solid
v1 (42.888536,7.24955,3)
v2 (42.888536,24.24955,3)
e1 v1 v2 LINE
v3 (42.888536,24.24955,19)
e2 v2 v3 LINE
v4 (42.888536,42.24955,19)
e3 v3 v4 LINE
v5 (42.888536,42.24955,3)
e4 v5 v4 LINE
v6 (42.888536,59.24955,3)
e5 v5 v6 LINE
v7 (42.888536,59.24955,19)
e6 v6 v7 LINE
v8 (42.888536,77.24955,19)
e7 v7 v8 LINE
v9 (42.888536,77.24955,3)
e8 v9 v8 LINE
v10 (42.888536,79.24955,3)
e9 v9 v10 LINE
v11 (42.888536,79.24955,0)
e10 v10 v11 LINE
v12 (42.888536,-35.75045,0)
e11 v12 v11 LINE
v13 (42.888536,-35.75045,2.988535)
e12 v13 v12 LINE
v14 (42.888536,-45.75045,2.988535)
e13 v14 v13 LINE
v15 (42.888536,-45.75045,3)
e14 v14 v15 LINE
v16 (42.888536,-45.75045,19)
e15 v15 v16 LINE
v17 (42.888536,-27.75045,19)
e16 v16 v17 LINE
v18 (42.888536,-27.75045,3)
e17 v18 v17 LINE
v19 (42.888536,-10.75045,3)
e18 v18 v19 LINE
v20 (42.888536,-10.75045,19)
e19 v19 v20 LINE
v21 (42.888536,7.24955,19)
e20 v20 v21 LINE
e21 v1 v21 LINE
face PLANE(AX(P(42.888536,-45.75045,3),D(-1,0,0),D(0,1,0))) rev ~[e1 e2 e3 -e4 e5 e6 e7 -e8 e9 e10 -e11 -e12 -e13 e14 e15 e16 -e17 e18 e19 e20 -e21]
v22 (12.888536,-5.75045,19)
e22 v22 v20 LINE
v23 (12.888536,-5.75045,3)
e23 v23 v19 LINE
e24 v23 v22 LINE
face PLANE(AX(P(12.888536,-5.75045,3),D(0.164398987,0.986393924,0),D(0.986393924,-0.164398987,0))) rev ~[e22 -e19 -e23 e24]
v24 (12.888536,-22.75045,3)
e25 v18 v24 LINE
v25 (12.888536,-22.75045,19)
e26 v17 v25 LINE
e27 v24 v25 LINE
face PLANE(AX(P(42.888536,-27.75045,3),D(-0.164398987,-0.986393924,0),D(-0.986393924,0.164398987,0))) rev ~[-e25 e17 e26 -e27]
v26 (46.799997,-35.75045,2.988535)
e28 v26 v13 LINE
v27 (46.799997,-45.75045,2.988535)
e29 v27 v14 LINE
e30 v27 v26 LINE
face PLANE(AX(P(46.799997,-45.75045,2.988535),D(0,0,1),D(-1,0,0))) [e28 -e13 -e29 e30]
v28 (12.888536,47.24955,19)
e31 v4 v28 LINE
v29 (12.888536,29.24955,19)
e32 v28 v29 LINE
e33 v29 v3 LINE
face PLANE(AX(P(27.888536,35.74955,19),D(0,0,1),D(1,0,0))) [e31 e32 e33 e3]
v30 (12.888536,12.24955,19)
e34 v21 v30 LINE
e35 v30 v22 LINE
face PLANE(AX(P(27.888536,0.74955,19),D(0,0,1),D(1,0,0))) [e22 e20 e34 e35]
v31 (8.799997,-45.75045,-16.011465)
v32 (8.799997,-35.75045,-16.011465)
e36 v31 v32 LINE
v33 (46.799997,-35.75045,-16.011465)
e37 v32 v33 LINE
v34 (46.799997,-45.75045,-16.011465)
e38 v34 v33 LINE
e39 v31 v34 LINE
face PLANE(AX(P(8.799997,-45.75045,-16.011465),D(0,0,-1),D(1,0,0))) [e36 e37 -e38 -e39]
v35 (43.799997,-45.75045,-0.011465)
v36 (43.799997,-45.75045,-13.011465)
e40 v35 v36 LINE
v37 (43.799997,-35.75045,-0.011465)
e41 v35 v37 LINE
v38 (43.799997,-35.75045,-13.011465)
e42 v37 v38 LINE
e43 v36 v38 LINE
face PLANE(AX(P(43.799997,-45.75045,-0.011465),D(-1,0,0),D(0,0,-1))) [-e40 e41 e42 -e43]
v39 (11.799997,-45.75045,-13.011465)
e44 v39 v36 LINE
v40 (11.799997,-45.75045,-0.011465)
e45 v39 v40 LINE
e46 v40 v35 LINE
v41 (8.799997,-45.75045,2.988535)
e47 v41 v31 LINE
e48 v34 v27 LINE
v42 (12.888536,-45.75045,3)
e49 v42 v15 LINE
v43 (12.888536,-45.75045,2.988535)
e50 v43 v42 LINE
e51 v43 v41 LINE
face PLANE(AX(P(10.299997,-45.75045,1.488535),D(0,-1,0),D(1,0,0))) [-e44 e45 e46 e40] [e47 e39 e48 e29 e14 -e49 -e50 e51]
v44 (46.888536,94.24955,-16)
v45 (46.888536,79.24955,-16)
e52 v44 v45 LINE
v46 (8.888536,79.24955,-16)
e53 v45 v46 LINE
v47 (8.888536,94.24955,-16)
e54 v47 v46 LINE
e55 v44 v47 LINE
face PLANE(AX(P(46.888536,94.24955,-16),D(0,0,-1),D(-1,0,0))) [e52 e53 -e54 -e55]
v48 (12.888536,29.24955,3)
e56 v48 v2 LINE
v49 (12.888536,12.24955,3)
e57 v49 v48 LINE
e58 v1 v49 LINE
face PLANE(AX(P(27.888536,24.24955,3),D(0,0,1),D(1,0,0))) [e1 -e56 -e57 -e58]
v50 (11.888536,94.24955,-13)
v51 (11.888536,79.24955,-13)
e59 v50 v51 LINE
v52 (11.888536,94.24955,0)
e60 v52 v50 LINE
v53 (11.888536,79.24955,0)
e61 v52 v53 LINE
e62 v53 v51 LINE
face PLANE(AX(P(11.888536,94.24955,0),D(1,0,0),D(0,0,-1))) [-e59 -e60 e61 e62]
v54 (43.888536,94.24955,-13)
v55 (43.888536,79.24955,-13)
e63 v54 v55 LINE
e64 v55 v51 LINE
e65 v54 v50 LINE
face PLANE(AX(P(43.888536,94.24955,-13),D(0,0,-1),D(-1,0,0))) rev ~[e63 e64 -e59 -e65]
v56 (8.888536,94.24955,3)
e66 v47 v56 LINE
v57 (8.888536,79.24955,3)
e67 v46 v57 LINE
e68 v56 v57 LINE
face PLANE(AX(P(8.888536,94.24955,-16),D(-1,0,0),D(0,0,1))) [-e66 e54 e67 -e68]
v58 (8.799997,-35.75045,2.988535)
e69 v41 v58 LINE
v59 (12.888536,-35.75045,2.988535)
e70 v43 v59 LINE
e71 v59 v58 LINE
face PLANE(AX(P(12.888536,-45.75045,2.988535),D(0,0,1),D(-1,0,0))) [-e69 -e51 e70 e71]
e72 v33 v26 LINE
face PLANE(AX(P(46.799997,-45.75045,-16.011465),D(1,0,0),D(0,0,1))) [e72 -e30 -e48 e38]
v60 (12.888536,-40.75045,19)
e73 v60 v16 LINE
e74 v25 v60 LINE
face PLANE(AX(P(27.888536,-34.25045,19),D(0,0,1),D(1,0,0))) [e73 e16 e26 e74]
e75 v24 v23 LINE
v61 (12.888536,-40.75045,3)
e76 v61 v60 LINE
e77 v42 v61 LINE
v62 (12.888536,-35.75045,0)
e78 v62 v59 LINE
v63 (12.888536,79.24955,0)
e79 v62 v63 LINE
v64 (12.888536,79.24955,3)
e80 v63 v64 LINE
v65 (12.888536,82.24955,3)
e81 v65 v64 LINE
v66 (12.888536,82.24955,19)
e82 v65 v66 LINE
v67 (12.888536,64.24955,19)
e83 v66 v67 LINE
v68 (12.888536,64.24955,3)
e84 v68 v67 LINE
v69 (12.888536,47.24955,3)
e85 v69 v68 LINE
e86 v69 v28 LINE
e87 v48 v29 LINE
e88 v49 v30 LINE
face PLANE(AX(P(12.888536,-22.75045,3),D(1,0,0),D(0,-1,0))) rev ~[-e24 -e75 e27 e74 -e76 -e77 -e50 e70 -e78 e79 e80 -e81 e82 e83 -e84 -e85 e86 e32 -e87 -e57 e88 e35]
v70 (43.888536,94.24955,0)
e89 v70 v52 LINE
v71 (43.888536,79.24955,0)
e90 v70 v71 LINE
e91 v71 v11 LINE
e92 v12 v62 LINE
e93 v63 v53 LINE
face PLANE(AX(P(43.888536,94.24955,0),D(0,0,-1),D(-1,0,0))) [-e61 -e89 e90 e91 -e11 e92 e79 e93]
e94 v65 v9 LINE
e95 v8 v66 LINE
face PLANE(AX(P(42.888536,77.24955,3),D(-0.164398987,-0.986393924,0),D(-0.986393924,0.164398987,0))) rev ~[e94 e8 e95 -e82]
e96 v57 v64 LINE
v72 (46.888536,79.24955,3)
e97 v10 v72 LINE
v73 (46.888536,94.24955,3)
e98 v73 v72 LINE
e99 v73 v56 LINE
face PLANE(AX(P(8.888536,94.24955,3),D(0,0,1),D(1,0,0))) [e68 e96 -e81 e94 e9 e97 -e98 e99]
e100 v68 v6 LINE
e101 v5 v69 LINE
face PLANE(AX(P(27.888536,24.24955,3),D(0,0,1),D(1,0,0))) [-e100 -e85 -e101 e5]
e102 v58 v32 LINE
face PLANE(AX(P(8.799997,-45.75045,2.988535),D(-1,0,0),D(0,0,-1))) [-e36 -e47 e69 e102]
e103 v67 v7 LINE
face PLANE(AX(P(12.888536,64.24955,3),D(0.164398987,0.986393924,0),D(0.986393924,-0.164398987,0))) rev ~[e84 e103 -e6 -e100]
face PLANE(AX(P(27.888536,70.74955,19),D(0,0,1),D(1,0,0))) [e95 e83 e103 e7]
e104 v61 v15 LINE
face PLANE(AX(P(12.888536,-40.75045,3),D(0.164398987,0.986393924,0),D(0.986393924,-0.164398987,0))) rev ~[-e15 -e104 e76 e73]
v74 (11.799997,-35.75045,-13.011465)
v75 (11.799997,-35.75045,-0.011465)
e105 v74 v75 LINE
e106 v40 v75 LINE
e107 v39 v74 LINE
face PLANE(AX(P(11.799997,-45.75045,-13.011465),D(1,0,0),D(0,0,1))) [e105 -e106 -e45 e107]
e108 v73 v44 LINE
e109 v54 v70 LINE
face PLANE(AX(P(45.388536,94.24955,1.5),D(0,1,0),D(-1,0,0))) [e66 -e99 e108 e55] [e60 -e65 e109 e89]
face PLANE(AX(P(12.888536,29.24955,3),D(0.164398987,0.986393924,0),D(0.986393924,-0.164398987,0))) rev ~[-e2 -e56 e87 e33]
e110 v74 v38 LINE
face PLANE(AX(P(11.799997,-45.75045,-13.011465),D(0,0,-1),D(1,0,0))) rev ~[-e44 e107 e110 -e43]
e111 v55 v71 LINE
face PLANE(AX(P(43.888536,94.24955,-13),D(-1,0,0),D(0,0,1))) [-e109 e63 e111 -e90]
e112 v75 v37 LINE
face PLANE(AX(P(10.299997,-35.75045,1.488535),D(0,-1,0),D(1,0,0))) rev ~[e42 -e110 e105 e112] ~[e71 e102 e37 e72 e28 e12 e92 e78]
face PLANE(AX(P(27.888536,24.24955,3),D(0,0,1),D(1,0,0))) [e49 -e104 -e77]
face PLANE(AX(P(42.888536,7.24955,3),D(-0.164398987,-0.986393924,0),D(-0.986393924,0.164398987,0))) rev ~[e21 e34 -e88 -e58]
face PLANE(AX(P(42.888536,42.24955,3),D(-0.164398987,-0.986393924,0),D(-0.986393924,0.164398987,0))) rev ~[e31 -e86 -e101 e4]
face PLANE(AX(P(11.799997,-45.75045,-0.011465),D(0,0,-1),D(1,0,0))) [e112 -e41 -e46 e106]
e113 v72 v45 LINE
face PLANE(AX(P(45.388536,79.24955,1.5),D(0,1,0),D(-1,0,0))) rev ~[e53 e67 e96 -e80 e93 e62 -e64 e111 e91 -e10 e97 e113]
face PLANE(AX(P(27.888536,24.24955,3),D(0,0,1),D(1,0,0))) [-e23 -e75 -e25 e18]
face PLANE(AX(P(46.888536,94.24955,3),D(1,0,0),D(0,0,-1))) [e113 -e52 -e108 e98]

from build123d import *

# Parameters (mm, degrees)
F0_W     = 30
F0_H     = 140
F1_DEPTH = 3
F3_DEPTH = 16
F4_W     = 3
F4_H     = 3
F4_W_2   = 1
F4_W_3   = 30
F4_W_4   = 32
F5_DEPTH = 15
F6_W     = 3
F6_H     = 3
F6_W_2   = 32
F7_DEPTH = 10


with BuildPart() as f1:
    # F0 (on Top) → F1 (new body)
    with BuildSketch(Plane.XY):
        with Locations((27.8885364532, 24.2495501014)):
            Rectangle(F0_W, F0_H)
    extrude(amount=F1_DEPTH)

    # F2 (on face) → F3 (join)
    with BuildSketch(Plane.XY.offset(3)):
        Polygon((42.8885364532, -27.7504498986), (12.8885364532, -22.7504498986), (12.8885364532, -40.7504498986), (42.8885364532, -45.7504498986), align=None)
        Polygon((12.8885364532, 12.2495501014), (12.8885364532, -5.7504498986), (42.8885364532, -10.7504498986), (42.8885364532, 7.2495501014), align=None)
        Polygon((12.8885364532, 47.2495501014), (12.8885364532, 29.2495501014), (42.8885364532, 24.2495501014), (42.8885364532, 42.2495501014), align=None)
        Polygon((12.8885364532, 82.2495501014), (12.8885364532, 64.2495501014), (42.8885364532, 59.2495501014), (42.8885364532, 77.2495501014), align=None)
    extrude(amount=F3_DEPTH)

    # F4 (on face) → F5 (join)
    with BuildSketch(Plane(origin=(0, 94.2495501014, 0), x_dir=(-1, 0, 0), z_dir=(0, 1, 0))):
        with Locations((-45.3885364532, 1.5)):
            Rectangle(F4_W, F4_H)
        with Locations((-43.3885364532, 1.5)):
            Rectangle(F4_W_2, F4_H)
        Polygon((-43.8885364532, 0), (-46.8885364532, 0), (-46.8885364532, -16), (-43.8885364532, -16), (-43.8885364532, -13), align=None)
        with Locations((-27.8885364532, 1.5)):
            Rectangle(F4_W_3, F4_H)
        with Locations((-27.8885364532, -14.5)):
            Rectangle(F4_W_4, F4_H)
        with Locations((-12.3885364532, 1.5)):
            Rectangle(F4_W_2, F4_H)
        Polygon((-11.8885364532, 0), (-11.8885364532, -13), (-11.8885364532, -16), (-8.8885364532, -16), (-8.8885364532, 0), align=None)
        with Locations((-10.3885364532, 1.5)):
            Rectangle(F4_W, F4_H)
    extrude(amount=-F5_DEPTH)

    # F6 (on face) → F7 (join)
    with BuildSketch(Plane.XZ.offset(45.7504498986)):
        with Locations((10.2999972403, 1.4885346591)):
            Rectangle(F6_W, F6_H)
        Polygon((11.7999972403, -0.0114653409), (8.7999972403, -0.0114653409), (8.7999972403, -16.0114653409), (11.7999972403, -16.0114653409), (11.7999972403, -13.0114653409), align=None)
        with Locations((27.7999972403, -14.5114653409)):
            Rectangle(F6_W_2, F6_H)
        Polygon((46.7999972403, -0.0114653409), (43.7999972403, -0.0114653409), (43.7999972403, -13.0114653409), (43.7999972403, -16.0114653409), (46.7999972403, -16.0114653409), align=None)
        with Locations((45.2999972403, 1.4885346591)):
            Rectangle(F6_W, F6_H)
        Polygon((12.8885364532, 2.9885346591), (11.7999972403, 2.9885346591), (11.7999972403, -0.0114653409), (43.7999972403, -0.0114653409), (43.7999972403, 2.9885346591), (42.8885364532, 2.9885346591), (42.8885364532, 0), (12.8885364532, 0), align=None)
    extrude(amount=-F7_DEPTH)


solid = f1.part
